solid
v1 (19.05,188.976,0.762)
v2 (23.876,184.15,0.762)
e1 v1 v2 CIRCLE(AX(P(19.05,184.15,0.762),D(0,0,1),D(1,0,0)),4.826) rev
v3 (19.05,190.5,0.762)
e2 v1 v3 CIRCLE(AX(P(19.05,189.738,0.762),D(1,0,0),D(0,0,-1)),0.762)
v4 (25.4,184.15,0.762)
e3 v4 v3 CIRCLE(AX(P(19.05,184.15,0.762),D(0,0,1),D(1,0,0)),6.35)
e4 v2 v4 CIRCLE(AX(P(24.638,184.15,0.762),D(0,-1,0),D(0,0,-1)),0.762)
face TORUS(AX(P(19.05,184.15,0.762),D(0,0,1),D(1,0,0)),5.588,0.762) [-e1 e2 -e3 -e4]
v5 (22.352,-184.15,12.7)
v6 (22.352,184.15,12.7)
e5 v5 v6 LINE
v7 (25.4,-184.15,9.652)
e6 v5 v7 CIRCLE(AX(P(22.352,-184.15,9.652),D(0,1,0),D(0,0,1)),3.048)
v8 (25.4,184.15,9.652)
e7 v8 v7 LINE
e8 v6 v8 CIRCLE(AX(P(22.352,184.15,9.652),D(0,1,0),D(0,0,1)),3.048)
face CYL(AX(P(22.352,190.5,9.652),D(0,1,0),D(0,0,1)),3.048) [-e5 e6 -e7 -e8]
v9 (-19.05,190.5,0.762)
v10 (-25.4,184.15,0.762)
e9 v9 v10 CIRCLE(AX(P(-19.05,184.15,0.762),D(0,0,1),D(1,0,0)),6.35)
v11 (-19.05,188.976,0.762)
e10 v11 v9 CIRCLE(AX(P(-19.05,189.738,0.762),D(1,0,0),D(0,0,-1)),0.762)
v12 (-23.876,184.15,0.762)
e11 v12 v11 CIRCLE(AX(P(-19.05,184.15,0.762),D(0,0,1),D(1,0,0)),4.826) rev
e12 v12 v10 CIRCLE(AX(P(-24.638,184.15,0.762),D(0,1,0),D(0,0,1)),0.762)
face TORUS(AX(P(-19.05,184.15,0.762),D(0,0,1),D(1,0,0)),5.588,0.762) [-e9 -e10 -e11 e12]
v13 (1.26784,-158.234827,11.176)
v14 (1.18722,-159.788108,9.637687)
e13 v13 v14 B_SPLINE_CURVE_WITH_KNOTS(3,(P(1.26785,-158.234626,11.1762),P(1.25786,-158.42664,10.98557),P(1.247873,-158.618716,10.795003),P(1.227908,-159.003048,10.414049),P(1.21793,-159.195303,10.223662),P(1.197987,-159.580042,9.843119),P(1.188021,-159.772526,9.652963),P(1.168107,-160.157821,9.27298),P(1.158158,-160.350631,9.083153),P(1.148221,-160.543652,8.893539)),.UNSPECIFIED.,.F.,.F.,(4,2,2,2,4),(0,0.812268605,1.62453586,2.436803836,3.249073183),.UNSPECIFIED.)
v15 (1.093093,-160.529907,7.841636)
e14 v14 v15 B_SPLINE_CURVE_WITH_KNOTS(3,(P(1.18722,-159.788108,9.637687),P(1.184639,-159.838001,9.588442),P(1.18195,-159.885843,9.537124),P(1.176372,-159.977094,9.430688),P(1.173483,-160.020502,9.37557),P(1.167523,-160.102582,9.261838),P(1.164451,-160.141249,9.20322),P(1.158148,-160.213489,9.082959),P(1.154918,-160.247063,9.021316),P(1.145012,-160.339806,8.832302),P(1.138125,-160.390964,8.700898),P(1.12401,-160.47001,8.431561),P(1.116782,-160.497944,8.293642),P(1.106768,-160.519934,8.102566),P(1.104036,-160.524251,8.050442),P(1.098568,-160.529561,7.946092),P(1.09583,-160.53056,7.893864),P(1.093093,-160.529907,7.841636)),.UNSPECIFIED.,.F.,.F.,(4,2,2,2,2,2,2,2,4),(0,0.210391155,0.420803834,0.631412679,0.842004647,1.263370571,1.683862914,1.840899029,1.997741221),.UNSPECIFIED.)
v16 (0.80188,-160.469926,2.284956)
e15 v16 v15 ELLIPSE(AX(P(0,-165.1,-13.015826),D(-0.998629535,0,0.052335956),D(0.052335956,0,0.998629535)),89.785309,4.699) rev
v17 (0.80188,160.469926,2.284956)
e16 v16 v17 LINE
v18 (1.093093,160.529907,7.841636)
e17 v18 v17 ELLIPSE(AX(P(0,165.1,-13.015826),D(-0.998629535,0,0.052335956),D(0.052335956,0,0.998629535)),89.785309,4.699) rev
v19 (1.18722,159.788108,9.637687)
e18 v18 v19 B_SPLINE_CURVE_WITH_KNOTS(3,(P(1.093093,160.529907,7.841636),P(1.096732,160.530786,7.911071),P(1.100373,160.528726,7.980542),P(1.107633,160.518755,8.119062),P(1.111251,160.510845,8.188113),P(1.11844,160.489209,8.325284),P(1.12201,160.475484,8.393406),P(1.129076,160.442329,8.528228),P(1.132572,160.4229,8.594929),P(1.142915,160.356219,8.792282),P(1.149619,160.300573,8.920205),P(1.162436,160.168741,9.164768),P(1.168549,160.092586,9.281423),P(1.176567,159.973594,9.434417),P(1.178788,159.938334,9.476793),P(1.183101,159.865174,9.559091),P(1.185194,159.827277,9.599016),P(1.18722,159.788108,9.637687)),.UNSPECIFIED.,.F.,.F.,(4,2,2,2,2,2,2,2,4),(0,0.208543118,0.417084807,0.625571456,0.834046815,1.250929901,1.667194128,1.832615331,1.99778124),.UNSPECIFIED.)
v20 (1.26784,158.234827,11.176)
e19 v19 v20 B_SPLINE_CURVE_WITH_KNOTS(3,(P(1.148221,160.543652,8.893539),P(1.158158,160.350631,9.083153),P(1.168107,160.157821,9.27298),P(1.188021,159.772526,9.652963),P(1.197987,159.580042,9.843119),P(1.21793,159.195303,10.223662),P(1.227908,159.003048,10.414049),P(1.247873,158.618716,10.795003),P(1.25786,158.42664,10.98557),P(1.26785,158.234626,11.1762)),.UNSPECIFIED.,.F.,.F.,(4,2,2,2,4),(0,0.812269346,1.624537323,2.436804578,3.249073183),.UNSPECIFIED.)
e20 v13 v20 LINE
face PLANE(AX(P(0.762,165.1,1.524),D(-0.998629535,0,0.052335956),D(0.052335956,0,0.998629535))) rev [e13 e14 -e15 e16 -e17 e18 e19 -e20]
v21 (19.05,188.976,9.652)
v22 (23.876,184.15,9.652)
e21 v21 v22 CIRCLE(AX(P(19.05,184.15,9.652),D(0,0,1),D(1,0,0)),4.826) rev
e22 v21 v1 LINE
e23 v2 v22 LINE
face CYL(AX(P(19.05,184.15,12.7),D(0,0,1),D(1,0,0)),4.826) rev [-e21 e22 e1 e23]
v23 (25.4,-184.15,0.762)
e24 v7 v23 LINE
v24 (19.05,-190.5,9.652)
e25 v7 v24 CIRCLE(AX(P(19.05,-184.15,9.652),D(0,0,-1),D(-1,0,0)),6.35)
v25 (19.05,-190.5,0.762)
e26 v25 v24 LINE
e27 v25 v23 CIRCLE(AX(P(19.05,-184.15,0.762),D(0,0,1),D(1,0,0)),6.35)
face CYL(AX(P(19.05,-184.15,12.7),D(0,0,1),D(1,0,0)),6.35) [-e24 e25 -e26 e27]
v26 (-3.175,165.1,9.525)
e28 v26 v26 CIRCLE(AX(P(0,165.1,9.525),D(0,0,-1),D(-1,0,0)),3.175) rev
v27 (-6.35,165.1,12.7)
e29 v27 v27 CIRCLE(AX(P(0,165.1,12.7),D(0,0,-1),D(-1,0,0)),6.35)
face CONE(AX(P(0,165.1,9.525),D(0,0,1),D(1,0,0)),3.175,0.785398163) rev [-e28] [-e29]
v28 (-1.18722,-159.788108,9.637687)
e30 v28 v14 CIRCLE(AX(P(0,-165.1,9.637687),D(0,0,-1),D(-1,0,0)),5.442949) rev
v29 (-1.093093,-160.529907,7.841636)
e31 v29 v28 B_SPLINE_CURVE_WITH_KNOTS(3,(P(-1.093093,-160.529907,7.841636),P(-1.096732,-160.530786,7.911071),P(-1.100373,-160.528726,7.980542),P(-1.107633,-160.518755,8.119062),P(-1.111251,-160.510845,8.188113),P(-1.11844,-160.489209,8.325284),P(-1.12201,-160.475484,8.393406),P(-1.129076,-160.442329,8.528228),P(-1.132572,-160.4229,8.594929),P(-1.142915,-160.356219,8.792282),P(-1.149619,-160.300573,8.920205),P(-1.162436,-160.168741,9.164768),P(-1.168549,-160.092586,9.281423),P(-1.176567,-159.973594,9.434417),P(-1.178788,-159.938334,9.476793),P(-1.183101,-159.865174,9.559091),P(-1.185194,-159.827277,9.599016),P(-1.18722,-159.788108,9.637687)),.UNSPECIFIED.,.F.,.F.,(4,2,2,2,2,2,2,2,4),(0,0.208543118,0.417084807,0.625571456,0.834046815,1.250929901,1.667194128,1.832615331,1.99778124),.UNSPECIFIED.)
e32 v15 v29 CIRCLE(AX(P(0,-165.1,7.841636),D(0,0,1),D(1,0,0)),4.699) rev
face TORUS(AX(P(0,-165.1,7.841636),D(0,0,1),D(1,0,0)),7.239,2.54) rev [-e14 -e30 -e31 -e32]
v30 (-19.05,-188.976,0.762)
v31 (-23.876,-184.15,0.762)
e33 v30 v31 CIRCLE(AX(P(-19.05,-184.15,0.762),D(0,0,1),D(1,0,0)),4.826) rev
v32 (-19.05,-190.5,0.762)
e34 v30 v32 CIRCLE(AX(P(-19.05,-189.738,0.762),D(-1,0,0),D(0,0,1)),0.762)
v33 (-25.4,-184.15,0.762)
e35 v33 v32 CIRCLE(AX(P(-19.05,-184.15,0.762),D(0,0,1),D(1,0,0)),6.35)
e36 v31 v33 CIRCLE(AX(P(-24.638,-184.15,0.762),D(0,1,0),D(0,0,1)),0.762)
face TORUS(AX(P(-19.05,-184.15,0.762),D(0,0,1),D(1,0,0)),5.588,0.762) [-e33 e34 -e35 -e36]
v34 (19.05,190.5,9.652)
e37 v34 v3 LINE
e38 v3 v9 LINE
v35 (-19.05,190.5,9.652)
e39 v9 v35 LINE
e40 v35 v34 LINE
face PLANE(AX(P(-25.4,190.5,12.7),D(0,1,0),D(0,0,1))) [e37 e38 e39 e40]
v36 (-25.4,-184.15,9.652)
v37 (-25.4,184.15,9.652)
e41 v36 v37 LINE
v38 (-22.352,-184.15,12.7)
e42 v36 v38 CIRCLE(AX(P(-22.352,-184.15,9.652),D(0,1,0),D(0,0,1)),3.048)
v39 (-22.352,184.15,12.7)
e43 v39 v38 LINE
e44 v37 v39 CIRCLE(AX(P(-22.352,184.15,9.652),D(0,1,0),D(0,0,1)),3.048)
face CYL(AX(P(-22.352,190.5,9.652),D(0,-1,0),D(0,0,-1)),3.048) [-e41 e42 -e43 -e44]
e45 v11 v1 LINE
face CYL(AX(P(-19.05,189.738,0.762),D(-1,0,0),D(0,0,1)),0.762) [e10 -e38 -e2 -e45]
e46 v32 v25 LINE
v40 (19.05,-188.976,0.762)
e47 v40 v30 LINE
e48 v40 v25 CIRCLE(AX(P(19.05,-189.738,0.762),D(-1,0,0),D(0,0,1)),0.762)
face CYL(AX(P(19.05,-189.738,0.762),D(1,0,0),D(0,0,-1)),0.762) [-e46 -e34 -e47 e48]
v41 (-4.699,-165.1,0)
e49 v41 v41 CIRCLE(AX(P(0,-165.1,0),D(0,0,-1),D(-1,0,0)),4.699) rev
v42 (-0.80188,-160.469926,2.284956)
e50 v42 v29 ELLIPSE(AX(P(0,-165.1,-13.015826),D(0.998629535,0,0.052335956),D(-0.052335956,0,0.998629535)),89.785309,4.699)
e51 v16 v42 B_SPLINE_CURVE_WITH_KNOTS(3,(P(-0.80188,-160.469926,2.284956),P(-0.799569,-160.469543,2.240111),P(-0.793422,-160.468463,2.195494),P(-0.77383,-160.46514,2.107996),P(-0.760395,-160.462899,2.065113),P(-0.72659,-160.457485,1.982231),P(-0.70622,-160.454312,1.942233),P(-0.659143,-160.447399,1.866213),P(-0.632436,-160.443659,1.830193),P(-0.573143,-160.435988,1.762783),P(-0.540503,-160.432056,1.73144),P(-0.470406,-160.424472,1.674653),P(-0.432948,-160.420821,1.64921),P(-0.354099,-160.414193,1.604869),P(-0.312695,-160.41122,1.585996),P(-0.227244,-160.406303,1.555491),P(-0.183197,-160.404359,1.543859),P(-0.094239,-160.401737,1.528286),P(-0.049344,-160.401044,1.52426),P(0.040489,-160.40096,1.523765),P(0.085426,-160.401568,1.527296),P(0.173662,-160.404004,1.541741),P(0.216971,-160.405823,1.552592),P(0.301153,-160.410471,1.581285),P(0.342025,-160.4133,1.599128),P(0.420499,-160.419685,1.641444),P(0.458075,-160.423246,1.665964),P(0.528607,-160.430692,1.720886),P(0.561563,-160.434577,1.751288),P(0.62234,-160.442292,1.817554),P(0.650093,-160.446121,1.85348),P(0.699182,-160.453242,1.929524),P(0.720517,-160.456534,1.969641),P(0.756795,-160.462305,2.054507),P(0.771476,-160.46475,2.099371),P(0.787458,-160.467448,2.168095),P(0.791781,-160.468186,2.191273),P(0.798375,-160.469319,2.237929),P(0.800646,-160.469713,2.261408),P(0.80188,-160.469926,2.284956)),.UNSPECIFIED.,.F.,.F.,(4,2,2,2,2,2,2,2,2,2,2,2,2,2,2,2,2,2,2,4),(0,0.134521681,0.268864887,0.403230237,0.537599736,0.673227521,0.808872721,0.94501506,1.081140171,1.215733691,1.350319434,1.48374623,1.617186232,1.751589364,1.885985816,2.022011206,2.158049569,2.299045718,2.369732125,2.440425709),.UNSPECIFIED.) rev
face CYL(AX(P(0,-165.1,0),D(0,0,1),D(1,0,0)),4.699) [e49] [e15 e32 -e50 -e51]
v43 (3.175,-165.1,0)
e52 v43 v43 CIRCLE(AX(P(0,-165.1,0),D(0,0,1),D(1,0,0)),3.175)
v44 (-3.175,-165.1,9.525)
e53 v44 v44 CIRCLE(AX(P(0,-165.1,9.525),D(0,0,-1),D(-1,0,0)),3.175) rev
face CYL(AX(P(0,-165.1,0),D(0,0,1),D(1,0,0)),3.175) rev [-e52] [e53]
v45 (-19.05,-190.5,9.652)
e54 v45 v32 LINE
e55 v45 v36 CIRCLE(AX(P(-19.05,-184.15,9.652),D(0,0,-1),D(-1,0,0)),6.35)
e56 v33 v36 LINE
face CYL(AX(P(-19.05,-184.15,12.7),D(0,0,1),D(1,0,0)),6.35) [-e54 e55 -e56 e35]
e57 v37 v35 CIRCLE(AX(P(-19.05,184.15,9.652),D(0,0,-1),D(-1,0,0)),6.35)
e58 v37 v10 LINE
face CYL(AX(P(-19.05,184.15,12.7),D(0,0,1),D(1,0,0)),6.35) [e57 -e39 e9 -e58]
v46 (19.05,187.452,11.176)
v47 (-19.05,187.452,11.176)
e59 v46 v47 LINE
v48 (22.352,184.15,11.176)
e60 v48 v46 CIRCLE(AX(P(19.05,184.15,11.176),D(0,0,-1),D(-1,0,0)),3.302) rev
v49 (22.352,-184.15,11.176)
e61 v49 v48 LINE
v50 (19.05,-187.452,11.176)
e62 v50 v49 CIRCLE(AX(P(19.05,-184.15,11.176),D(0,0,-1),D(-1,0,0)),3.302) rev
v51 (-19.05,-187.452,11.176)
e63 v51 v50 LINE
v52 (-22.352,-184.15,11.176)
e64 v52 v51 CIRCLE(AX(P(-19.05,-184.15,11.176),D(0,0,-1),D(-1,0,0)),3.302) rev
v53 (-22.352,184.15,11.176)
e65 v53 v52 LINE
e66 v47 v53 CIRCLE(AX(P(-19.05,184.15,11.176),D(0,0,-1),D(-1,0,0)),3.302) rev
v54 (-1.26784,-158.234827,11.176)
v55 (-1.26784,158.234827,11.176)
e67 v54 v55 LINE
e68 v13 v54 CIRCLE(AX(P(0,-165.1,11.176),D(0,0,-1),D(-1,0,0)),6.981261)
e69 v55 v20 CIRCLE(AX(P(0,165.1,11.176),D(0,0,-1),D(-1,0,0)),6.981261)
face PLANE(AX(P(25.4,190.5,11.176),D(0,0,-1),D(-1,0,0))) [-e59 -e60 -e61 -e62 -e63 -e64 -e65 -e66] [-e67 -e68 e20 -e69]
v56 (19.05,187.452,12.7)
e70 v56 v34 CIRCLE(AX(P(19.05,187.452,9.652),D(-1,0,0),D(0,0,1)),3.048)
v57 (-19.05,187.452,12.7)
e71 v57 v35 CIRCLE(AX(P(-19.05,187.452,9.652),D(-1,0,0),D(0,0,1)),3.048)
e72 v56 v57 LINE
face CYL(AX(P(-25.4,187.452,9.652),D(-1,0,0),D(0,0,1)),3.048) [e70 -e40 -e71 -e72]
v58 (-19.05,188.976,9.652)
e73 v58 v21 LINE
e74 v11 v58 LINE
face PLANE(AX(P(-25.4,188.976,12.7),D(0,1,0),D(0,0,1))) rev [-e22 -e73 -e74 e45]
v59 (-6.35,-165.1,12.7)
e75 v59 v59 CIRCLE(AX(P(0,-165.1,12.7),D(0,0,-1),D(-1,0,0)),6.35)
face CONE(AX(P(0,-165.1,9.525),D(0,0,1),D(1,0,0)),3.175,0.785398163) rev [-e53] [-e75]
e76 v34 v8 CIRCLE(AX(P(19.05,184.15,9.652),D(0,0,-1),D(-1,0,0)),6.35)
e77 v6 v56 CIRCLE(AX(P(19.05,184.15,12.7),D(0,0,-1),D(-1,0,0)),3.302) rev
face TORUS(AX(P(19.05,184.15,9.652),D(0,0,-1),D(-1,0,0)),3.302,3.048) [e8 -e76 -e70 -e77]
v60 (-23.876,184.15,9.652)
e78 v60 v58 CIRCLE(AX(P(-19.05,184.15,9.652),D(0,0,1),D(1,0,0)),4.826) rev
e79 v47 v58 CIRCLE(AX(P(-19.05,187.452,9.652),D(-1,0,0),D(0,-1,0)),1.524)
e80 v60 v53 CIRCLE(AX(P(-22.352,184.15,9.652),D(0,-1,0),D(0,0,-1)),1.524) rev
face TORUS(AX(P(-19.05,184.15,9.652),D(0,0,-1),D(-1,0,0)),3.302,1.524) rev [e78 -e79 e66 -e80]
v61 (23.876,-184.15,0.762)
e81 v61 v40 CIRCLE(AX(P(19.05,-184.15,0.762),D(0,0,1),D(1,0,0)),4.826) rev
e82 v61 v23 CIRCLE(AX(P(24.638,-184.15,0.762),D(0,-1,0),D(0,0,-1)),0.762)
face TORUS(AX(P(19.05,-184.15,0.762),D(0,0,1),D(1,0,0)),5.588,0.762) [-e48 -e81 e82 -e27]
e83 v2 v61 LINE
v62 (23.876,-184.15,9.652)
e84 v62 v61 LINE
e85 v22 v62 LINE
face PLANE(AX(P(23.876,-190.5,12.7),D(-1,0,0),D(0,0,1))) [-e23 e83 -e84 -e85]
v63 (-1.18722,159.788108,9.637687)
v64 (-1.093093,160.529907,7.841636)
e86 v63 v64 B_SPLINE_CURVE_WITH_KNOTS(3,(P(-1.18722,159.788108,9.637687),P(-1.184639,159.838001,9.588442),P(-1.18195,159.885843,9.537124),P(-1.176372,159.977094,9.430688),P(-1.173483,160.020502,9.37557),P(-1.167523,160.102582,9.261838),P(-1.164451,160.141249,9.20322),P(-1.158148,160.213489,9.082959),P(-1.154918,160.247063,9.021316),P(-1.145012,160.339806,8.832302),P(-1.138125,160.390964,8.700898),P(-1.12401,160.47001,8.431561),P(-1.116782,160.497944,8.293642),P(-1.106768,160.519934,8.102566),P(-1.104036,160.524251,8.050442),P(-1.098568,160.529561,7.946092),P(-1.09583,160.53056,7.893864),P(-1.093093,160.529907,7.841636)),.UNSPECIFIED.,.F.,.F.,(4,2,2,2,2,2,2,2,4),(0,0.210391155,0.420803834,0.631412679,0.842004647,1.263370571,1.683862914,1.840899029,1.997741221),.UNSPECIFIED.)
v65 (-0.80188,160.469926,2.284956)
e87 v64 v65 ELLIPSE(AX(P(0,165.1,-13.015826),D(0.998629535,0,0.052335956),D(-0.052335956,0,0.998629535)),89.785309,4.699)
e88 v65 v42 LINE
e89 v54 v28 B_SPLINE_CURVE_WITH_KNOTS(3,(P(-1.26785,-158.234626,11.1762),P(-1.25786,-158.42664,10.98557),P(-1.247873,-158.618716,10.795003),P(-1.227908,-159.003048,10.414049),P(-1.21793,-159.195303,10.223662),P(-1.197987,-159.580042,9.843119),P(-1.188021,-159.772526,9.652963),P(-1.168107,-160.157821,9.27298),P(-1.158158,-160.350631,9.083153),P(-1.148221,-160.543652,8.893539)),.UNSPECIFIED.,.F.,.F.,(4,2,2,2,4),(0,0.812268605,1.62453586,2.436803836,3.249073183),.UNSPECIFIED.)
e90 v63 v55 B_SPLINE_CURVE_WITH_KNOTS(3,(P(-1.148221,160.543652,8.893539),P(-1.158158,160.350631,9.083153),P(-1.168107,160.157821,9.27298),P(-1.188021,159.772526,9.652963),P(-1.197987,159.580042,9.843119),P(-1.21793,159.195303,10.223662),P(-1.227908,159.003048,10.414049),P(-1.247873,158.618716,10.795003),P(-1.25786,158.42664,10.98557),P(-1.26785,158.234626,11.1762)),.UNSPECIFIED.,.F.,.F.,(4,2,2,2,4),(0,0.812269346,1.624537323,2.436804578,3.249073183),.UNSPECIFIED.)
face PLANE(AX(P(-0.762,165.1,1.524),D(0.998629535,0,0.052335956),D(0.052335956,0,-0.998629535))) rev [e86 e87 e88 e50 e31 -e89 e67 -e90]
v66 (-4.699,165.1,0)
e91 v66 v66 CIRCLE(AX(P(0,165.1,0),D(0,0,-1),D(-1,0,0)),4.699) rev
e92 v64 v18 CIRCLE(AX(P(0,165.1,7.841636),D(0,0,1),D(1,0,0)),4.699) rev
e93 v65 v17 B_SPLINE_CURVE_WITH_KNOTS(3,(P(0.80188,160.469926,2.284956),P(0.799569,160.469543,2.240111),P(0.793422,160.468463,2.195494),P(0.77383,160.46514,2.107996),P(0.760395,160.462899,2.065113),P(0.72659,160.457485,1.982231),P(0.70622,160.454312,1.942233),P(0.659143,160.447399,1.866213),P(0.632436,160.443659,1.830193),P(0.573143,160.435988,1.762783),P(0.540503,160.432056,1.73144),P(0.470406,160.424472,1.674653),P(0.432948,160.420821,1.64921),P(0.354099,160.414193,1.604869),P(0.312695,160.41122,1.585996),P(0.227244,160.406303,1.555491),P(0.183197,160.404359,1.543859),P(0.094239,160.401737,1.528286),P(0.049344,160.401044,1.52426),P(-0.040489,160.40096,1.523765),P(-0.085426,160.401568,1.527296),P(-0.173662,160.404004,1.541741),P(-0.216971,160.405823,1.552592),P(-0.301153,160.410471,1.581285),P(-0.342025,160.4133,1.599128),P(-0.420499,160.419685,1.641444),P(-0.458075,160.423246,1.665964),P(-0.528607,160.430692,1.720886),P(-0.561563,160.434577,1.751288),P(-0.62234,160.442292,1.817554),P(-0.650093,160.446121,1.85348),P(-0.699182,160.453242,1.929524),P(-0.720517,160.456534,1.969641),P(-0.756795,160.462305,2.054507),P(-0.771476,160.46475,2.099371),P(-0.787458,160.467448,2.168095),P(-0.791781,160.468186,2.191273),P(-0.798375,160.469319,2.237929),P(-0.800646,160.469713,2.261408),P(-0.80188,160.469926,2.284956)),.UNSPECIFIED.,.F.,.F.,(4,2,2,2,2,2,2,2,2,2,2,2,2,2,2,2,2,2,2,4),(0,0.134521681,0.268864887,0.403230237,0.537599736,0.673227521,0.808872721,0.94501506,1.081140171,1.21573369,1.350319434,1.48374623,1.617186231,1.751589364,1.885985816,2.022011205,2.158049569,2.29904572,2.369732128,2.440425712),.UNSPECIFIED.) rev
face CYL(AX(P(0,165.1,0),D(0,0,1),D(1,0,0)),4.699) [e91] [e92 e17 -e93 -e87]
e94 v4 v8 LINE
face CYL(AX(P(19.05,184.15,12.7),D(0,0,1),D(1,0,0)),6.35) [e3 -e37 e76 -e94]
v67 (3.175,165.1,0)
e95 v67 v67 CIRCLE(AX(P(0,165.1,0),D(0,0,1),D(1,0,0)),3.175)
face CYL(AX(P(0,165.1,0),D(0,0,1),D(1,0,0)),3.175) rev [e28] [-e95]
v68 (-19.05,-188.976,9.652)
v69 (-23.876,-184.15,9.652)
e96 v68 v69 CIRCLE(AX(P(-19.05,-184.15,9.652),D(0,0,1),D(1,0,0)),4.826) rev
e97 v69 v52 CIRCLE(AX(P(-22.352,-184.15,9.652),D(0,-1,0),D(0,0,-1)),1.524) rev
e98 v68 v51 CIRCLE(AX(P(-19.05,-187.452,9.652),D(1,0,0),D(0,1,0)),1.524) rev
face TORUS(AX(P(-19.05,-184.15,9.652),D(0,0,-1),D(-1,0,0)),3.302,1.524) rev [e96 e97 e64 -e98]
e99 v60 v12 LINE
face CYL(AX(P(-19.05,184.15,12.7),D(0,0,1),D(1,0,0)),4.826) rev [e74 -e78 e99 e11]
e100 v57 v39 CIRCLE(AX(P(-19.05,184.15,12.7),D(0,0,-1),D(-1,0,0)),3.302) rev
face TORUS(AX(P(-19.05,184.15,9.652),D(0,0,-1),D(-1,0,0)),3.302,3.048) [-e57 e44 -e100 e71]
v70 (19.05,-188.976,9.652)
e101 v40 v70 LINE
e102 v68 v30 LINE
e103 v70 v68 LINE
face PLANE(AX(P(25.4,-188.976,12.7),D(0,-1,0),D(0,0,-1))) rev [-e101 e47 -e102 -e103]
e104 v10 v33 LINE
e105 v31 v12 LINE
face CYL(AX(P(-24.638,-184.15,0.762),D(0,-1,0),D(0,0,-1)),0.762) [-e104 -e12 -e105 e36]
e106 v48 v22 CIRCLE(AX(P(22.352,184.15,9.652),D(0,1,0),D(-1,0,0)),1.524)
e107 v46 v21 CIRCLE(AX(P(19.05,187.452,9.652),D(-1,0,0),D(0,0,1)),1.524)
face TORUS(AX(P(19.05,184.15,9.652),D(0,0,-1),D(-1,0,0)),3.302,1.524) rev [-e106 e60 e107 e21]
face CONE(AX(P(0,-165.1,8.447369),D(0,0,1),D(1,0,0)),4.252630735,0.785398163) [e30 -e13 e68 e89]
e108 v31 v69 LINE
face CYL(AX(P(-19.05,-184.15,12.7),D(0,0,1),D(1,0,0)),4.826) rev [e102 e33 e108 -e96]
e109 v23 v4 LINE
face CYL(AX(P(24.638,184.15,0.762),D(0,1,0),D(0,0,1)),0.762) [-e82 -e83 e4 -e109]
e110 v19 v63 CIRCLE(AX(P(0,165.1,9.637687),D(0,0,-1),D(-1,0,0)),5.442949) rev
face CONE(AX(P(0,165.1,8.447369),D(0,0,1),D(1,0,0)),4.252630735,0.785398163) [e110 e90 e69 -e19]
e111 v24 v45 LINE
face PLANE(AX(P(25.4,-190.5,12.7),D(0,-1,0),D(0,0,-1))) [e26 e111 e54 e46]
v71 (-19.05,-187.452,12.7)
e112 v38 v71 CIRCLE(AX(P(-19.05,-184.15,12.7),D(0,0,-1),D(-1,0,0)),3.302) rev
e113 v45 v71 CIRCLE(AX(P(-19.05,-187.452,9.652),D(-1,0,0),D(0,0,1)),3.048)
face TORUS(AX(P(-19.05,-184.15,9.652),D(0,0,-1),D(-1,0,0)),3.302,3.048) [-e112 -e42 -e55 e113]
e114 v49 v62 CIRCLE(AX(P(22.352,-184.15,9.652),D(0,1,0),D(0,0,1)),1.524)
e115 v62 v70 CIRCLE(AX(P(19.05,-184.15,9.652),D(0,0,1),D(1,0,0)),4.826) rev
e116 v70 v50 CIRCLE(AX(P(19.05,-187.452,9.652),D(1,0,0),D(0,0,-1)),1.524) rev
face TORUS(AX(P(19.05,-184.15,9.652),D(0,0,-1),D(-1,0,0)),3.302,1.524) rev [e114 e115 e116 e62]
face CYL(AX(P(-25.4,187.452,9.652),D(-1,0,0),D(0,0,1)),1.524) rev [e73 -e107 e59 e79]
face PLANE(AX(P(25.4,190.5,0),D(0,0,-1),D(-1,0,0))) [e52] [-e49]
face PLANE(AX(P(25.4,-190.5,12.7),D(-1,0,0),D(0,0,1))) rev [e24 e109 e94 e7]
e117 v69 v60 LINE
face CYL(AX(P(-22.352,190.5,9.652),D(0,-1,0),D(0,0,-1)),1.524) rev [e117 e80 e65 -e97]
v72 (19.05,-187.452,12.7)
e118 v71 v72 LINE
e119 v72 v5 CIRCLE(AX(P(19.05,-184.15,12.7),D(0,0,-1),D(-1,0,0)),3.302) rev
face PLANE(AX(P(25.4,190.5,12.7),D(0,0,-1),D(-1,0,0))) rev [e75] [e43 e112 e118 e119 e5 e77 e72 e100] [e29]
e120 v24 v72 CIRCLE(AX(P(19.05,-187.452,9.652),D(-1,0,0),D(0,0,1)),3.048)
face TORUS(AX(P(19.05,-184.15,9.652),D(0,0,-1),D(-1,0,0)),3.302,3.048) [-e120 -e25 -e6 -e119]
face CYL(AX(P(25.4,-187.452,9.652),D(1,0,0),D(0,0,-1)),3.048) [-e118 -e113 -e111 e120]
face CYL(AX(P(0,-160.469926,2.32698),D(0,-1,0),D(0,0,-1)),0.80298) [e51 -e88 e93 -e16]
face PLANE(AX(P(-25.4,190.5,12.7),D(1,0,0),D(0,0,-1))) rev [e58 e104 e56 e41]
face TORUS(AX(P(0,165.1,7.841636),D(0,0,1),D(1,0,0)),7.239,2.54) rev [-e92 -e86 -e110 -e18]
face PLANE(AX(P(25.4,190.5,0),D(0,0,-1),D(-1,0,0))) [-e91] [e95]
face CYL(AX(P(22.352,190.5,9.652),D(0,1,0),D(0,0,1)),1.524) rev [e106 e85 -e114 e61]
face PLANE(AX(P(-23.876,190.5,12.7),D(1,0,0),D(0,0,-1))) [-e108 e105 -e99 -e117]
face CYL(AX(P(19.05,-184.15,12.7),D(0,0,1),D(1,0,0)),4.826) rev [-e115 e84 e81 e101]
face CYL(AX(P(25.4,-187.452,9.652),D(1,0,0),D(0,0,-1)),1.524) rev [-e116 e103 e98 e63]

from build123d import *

# Parameters (mm, degrees)
SKETCH1_W          = 50.8
SKETCH1_H          = 381
BASE_EXTRUDE_DEPTH = 12.7
SKETCH2_R          = 3.175
CUT_EXTRUDE1_DEPTH = 193.605036279
CHAMFER1_SIZE      = 3.175
FILLET1_R          = 6.35
FILLET2_R          = 3.048
SHELL1_T           = -1.524
RIB1_REACH         = 194.511
SKETCH3_WALLS_W    = 1.524
SKETCH3_WALLS_H    = 717.22110579
RIB1_DRAFT_ANGLE   = 3
FILLET3_R          = 0.80298
FILLET4_R          = 0.762
FILLET5_R          = 2.54


with BuildPart() as part:
    # Sketch1 → Base-Extrude (new body)
    with BuildSketch(Plane.XY):
        Rectangle(SKETCH1_W, SKETCH1_H)
    extrude(amount=BASE_EXTRUDE_DEPTH)

    # Sketch2 → Cut-Extrude1 (cut, through all)
    with BuildSketch(Plane.XY.offset(12.7)):
        with Locations((0, -165.1)):
            Circle(SKETCH2_R)
        with Locations((0, 165.1)):
            Circle(SKETCH2_R)
    extrude(amount=-CUT_EXTRUDE1_DEPTH, mode=Mode.SUBTRACT)

    # Chamfer1
    chamfer1_edges = [part.edges().sort_by_distance(p)[0] for p in [
        (-3.175, -165.1, 12.7),
        (-3.175, 165.1, 12.7),
    ]]
    chamfer(chamfer1_edges, length=CHAMFER1_SIZE)

    # Fillet1
    fillet1_edges = [part.edges().sort_by_distance(p)[0] for p in [
        (25.4, -190.5, 6.35),
        (-25.4, -190.5, 6.35),
        (-25.4, 190.5, 6.35),
        (25.4, 190.5, 6.35),
    ]]
    fillet(fillet1_edges, radius=FILLET1_R)

    # Fillet2
    fillet2_edges = [part.edges().sort_by_distance(p)[0] for p in [
        (25.4, 0, 12.7),
        (0, -190.5, 12.7),
        (0, 190.5, 12.7),
        (-25.4, 0, 12.7),
        (23.540128061, 188.640128061, 12.7),
        (-23.540128061, 188.640128061, 12.7),
        (-23.540128061, -188.640128061, 12.7),
        (23.540128061, -188.640128061, 12.7),
    ]]
    fillet(fillet2_edges, radius=FILLET2_R)

    # Shell1
    shell1_openings = [part.faces().sort_by_distance(p)[0] for p in [
        (0, 0, 0),
    ]]
    offset(amount=SHELL1_T, openings=shell1_openings, kind=Kind.INTERSECTION)

    # Sketch3 walls → Rib1 (add, up to next)
    with BuildSketch(Plane(origin=(0, 0, 1.524), x_dir=(-1, 0, 0), z_dir=(0, 0, -1)), mode=Mode.PRIVATE) as rib1_sk1:
        Rectangle(SKETCH3_WALLS_W, SKETCH3_WALLS_H)
    rib1_tool1 = extrude(rib1_sk1.sketch, amount=-RIB1_REACH, mode=Mode.PRIVATE) - part.part
    add(rib1_tool1.solids().sort_by_distance((0, 0, 1.524))[0])

    # Rib1 draft
    rib1_draft_faces = [part.faces().sort_by_distance(p)[0] for p in [
        (0.762, 0, 1.905),
        (-0.762, 0, 1.905),
    ]]
    draft(rib1_draft_faces, Plane(origin=(0, 0, 1.524), x_dir=(-1, 0, 0), z_dir=(0, 0, -1)), RIB1_DRAFT_ANGLE)

    # Fillet3
    fillet3_edges = [part.edges().sort_by_distance(p)[0] for p in [
        (0.762, 0, 1.524),
        (-0.762, 0, 1.524),
    ]]
    fillet(fillet3_edges, radius=FILLET3_R - 0.0001)  # a hair under: the kernel refuses the full size

    # Fillet4
    fillet4_edges = [part.edges().sort_by_distance(p)[0] for p in [
        (25.4, 0, 0),
        (0, -190.5, 0),
        (-25.4, 0, 0),
        (0, 190.5, 0),
        (23.540128061, 188.640128061, 0),
        (-23.540128061, 188.640128061, 0),
        (-23.540128061, -188.640128061, 0),
        (23.540128061, -188.640128061, 0),
        (23.876, 0, 0),
        (-23.876, 0, 0),
        (0, -188.976, 0),
        (0, 188.976, 0),
    ]]
    fillet(fillet4_edges, radius=FILLET4_R - 0.0001)  # a hair under: the kernel refuses the full size

    # Fillet5
    fillet5_edges = [part.edges().sort_by_distance(p)[0] for p in [
        (-2.888343865, -168.80649035, 8.893738531),
        (-2.888343865, 168.80649035, 8.893738531),
    ]]
    fillet(fillet5_edges, radius=FILLET5_R)


solid = part.part
